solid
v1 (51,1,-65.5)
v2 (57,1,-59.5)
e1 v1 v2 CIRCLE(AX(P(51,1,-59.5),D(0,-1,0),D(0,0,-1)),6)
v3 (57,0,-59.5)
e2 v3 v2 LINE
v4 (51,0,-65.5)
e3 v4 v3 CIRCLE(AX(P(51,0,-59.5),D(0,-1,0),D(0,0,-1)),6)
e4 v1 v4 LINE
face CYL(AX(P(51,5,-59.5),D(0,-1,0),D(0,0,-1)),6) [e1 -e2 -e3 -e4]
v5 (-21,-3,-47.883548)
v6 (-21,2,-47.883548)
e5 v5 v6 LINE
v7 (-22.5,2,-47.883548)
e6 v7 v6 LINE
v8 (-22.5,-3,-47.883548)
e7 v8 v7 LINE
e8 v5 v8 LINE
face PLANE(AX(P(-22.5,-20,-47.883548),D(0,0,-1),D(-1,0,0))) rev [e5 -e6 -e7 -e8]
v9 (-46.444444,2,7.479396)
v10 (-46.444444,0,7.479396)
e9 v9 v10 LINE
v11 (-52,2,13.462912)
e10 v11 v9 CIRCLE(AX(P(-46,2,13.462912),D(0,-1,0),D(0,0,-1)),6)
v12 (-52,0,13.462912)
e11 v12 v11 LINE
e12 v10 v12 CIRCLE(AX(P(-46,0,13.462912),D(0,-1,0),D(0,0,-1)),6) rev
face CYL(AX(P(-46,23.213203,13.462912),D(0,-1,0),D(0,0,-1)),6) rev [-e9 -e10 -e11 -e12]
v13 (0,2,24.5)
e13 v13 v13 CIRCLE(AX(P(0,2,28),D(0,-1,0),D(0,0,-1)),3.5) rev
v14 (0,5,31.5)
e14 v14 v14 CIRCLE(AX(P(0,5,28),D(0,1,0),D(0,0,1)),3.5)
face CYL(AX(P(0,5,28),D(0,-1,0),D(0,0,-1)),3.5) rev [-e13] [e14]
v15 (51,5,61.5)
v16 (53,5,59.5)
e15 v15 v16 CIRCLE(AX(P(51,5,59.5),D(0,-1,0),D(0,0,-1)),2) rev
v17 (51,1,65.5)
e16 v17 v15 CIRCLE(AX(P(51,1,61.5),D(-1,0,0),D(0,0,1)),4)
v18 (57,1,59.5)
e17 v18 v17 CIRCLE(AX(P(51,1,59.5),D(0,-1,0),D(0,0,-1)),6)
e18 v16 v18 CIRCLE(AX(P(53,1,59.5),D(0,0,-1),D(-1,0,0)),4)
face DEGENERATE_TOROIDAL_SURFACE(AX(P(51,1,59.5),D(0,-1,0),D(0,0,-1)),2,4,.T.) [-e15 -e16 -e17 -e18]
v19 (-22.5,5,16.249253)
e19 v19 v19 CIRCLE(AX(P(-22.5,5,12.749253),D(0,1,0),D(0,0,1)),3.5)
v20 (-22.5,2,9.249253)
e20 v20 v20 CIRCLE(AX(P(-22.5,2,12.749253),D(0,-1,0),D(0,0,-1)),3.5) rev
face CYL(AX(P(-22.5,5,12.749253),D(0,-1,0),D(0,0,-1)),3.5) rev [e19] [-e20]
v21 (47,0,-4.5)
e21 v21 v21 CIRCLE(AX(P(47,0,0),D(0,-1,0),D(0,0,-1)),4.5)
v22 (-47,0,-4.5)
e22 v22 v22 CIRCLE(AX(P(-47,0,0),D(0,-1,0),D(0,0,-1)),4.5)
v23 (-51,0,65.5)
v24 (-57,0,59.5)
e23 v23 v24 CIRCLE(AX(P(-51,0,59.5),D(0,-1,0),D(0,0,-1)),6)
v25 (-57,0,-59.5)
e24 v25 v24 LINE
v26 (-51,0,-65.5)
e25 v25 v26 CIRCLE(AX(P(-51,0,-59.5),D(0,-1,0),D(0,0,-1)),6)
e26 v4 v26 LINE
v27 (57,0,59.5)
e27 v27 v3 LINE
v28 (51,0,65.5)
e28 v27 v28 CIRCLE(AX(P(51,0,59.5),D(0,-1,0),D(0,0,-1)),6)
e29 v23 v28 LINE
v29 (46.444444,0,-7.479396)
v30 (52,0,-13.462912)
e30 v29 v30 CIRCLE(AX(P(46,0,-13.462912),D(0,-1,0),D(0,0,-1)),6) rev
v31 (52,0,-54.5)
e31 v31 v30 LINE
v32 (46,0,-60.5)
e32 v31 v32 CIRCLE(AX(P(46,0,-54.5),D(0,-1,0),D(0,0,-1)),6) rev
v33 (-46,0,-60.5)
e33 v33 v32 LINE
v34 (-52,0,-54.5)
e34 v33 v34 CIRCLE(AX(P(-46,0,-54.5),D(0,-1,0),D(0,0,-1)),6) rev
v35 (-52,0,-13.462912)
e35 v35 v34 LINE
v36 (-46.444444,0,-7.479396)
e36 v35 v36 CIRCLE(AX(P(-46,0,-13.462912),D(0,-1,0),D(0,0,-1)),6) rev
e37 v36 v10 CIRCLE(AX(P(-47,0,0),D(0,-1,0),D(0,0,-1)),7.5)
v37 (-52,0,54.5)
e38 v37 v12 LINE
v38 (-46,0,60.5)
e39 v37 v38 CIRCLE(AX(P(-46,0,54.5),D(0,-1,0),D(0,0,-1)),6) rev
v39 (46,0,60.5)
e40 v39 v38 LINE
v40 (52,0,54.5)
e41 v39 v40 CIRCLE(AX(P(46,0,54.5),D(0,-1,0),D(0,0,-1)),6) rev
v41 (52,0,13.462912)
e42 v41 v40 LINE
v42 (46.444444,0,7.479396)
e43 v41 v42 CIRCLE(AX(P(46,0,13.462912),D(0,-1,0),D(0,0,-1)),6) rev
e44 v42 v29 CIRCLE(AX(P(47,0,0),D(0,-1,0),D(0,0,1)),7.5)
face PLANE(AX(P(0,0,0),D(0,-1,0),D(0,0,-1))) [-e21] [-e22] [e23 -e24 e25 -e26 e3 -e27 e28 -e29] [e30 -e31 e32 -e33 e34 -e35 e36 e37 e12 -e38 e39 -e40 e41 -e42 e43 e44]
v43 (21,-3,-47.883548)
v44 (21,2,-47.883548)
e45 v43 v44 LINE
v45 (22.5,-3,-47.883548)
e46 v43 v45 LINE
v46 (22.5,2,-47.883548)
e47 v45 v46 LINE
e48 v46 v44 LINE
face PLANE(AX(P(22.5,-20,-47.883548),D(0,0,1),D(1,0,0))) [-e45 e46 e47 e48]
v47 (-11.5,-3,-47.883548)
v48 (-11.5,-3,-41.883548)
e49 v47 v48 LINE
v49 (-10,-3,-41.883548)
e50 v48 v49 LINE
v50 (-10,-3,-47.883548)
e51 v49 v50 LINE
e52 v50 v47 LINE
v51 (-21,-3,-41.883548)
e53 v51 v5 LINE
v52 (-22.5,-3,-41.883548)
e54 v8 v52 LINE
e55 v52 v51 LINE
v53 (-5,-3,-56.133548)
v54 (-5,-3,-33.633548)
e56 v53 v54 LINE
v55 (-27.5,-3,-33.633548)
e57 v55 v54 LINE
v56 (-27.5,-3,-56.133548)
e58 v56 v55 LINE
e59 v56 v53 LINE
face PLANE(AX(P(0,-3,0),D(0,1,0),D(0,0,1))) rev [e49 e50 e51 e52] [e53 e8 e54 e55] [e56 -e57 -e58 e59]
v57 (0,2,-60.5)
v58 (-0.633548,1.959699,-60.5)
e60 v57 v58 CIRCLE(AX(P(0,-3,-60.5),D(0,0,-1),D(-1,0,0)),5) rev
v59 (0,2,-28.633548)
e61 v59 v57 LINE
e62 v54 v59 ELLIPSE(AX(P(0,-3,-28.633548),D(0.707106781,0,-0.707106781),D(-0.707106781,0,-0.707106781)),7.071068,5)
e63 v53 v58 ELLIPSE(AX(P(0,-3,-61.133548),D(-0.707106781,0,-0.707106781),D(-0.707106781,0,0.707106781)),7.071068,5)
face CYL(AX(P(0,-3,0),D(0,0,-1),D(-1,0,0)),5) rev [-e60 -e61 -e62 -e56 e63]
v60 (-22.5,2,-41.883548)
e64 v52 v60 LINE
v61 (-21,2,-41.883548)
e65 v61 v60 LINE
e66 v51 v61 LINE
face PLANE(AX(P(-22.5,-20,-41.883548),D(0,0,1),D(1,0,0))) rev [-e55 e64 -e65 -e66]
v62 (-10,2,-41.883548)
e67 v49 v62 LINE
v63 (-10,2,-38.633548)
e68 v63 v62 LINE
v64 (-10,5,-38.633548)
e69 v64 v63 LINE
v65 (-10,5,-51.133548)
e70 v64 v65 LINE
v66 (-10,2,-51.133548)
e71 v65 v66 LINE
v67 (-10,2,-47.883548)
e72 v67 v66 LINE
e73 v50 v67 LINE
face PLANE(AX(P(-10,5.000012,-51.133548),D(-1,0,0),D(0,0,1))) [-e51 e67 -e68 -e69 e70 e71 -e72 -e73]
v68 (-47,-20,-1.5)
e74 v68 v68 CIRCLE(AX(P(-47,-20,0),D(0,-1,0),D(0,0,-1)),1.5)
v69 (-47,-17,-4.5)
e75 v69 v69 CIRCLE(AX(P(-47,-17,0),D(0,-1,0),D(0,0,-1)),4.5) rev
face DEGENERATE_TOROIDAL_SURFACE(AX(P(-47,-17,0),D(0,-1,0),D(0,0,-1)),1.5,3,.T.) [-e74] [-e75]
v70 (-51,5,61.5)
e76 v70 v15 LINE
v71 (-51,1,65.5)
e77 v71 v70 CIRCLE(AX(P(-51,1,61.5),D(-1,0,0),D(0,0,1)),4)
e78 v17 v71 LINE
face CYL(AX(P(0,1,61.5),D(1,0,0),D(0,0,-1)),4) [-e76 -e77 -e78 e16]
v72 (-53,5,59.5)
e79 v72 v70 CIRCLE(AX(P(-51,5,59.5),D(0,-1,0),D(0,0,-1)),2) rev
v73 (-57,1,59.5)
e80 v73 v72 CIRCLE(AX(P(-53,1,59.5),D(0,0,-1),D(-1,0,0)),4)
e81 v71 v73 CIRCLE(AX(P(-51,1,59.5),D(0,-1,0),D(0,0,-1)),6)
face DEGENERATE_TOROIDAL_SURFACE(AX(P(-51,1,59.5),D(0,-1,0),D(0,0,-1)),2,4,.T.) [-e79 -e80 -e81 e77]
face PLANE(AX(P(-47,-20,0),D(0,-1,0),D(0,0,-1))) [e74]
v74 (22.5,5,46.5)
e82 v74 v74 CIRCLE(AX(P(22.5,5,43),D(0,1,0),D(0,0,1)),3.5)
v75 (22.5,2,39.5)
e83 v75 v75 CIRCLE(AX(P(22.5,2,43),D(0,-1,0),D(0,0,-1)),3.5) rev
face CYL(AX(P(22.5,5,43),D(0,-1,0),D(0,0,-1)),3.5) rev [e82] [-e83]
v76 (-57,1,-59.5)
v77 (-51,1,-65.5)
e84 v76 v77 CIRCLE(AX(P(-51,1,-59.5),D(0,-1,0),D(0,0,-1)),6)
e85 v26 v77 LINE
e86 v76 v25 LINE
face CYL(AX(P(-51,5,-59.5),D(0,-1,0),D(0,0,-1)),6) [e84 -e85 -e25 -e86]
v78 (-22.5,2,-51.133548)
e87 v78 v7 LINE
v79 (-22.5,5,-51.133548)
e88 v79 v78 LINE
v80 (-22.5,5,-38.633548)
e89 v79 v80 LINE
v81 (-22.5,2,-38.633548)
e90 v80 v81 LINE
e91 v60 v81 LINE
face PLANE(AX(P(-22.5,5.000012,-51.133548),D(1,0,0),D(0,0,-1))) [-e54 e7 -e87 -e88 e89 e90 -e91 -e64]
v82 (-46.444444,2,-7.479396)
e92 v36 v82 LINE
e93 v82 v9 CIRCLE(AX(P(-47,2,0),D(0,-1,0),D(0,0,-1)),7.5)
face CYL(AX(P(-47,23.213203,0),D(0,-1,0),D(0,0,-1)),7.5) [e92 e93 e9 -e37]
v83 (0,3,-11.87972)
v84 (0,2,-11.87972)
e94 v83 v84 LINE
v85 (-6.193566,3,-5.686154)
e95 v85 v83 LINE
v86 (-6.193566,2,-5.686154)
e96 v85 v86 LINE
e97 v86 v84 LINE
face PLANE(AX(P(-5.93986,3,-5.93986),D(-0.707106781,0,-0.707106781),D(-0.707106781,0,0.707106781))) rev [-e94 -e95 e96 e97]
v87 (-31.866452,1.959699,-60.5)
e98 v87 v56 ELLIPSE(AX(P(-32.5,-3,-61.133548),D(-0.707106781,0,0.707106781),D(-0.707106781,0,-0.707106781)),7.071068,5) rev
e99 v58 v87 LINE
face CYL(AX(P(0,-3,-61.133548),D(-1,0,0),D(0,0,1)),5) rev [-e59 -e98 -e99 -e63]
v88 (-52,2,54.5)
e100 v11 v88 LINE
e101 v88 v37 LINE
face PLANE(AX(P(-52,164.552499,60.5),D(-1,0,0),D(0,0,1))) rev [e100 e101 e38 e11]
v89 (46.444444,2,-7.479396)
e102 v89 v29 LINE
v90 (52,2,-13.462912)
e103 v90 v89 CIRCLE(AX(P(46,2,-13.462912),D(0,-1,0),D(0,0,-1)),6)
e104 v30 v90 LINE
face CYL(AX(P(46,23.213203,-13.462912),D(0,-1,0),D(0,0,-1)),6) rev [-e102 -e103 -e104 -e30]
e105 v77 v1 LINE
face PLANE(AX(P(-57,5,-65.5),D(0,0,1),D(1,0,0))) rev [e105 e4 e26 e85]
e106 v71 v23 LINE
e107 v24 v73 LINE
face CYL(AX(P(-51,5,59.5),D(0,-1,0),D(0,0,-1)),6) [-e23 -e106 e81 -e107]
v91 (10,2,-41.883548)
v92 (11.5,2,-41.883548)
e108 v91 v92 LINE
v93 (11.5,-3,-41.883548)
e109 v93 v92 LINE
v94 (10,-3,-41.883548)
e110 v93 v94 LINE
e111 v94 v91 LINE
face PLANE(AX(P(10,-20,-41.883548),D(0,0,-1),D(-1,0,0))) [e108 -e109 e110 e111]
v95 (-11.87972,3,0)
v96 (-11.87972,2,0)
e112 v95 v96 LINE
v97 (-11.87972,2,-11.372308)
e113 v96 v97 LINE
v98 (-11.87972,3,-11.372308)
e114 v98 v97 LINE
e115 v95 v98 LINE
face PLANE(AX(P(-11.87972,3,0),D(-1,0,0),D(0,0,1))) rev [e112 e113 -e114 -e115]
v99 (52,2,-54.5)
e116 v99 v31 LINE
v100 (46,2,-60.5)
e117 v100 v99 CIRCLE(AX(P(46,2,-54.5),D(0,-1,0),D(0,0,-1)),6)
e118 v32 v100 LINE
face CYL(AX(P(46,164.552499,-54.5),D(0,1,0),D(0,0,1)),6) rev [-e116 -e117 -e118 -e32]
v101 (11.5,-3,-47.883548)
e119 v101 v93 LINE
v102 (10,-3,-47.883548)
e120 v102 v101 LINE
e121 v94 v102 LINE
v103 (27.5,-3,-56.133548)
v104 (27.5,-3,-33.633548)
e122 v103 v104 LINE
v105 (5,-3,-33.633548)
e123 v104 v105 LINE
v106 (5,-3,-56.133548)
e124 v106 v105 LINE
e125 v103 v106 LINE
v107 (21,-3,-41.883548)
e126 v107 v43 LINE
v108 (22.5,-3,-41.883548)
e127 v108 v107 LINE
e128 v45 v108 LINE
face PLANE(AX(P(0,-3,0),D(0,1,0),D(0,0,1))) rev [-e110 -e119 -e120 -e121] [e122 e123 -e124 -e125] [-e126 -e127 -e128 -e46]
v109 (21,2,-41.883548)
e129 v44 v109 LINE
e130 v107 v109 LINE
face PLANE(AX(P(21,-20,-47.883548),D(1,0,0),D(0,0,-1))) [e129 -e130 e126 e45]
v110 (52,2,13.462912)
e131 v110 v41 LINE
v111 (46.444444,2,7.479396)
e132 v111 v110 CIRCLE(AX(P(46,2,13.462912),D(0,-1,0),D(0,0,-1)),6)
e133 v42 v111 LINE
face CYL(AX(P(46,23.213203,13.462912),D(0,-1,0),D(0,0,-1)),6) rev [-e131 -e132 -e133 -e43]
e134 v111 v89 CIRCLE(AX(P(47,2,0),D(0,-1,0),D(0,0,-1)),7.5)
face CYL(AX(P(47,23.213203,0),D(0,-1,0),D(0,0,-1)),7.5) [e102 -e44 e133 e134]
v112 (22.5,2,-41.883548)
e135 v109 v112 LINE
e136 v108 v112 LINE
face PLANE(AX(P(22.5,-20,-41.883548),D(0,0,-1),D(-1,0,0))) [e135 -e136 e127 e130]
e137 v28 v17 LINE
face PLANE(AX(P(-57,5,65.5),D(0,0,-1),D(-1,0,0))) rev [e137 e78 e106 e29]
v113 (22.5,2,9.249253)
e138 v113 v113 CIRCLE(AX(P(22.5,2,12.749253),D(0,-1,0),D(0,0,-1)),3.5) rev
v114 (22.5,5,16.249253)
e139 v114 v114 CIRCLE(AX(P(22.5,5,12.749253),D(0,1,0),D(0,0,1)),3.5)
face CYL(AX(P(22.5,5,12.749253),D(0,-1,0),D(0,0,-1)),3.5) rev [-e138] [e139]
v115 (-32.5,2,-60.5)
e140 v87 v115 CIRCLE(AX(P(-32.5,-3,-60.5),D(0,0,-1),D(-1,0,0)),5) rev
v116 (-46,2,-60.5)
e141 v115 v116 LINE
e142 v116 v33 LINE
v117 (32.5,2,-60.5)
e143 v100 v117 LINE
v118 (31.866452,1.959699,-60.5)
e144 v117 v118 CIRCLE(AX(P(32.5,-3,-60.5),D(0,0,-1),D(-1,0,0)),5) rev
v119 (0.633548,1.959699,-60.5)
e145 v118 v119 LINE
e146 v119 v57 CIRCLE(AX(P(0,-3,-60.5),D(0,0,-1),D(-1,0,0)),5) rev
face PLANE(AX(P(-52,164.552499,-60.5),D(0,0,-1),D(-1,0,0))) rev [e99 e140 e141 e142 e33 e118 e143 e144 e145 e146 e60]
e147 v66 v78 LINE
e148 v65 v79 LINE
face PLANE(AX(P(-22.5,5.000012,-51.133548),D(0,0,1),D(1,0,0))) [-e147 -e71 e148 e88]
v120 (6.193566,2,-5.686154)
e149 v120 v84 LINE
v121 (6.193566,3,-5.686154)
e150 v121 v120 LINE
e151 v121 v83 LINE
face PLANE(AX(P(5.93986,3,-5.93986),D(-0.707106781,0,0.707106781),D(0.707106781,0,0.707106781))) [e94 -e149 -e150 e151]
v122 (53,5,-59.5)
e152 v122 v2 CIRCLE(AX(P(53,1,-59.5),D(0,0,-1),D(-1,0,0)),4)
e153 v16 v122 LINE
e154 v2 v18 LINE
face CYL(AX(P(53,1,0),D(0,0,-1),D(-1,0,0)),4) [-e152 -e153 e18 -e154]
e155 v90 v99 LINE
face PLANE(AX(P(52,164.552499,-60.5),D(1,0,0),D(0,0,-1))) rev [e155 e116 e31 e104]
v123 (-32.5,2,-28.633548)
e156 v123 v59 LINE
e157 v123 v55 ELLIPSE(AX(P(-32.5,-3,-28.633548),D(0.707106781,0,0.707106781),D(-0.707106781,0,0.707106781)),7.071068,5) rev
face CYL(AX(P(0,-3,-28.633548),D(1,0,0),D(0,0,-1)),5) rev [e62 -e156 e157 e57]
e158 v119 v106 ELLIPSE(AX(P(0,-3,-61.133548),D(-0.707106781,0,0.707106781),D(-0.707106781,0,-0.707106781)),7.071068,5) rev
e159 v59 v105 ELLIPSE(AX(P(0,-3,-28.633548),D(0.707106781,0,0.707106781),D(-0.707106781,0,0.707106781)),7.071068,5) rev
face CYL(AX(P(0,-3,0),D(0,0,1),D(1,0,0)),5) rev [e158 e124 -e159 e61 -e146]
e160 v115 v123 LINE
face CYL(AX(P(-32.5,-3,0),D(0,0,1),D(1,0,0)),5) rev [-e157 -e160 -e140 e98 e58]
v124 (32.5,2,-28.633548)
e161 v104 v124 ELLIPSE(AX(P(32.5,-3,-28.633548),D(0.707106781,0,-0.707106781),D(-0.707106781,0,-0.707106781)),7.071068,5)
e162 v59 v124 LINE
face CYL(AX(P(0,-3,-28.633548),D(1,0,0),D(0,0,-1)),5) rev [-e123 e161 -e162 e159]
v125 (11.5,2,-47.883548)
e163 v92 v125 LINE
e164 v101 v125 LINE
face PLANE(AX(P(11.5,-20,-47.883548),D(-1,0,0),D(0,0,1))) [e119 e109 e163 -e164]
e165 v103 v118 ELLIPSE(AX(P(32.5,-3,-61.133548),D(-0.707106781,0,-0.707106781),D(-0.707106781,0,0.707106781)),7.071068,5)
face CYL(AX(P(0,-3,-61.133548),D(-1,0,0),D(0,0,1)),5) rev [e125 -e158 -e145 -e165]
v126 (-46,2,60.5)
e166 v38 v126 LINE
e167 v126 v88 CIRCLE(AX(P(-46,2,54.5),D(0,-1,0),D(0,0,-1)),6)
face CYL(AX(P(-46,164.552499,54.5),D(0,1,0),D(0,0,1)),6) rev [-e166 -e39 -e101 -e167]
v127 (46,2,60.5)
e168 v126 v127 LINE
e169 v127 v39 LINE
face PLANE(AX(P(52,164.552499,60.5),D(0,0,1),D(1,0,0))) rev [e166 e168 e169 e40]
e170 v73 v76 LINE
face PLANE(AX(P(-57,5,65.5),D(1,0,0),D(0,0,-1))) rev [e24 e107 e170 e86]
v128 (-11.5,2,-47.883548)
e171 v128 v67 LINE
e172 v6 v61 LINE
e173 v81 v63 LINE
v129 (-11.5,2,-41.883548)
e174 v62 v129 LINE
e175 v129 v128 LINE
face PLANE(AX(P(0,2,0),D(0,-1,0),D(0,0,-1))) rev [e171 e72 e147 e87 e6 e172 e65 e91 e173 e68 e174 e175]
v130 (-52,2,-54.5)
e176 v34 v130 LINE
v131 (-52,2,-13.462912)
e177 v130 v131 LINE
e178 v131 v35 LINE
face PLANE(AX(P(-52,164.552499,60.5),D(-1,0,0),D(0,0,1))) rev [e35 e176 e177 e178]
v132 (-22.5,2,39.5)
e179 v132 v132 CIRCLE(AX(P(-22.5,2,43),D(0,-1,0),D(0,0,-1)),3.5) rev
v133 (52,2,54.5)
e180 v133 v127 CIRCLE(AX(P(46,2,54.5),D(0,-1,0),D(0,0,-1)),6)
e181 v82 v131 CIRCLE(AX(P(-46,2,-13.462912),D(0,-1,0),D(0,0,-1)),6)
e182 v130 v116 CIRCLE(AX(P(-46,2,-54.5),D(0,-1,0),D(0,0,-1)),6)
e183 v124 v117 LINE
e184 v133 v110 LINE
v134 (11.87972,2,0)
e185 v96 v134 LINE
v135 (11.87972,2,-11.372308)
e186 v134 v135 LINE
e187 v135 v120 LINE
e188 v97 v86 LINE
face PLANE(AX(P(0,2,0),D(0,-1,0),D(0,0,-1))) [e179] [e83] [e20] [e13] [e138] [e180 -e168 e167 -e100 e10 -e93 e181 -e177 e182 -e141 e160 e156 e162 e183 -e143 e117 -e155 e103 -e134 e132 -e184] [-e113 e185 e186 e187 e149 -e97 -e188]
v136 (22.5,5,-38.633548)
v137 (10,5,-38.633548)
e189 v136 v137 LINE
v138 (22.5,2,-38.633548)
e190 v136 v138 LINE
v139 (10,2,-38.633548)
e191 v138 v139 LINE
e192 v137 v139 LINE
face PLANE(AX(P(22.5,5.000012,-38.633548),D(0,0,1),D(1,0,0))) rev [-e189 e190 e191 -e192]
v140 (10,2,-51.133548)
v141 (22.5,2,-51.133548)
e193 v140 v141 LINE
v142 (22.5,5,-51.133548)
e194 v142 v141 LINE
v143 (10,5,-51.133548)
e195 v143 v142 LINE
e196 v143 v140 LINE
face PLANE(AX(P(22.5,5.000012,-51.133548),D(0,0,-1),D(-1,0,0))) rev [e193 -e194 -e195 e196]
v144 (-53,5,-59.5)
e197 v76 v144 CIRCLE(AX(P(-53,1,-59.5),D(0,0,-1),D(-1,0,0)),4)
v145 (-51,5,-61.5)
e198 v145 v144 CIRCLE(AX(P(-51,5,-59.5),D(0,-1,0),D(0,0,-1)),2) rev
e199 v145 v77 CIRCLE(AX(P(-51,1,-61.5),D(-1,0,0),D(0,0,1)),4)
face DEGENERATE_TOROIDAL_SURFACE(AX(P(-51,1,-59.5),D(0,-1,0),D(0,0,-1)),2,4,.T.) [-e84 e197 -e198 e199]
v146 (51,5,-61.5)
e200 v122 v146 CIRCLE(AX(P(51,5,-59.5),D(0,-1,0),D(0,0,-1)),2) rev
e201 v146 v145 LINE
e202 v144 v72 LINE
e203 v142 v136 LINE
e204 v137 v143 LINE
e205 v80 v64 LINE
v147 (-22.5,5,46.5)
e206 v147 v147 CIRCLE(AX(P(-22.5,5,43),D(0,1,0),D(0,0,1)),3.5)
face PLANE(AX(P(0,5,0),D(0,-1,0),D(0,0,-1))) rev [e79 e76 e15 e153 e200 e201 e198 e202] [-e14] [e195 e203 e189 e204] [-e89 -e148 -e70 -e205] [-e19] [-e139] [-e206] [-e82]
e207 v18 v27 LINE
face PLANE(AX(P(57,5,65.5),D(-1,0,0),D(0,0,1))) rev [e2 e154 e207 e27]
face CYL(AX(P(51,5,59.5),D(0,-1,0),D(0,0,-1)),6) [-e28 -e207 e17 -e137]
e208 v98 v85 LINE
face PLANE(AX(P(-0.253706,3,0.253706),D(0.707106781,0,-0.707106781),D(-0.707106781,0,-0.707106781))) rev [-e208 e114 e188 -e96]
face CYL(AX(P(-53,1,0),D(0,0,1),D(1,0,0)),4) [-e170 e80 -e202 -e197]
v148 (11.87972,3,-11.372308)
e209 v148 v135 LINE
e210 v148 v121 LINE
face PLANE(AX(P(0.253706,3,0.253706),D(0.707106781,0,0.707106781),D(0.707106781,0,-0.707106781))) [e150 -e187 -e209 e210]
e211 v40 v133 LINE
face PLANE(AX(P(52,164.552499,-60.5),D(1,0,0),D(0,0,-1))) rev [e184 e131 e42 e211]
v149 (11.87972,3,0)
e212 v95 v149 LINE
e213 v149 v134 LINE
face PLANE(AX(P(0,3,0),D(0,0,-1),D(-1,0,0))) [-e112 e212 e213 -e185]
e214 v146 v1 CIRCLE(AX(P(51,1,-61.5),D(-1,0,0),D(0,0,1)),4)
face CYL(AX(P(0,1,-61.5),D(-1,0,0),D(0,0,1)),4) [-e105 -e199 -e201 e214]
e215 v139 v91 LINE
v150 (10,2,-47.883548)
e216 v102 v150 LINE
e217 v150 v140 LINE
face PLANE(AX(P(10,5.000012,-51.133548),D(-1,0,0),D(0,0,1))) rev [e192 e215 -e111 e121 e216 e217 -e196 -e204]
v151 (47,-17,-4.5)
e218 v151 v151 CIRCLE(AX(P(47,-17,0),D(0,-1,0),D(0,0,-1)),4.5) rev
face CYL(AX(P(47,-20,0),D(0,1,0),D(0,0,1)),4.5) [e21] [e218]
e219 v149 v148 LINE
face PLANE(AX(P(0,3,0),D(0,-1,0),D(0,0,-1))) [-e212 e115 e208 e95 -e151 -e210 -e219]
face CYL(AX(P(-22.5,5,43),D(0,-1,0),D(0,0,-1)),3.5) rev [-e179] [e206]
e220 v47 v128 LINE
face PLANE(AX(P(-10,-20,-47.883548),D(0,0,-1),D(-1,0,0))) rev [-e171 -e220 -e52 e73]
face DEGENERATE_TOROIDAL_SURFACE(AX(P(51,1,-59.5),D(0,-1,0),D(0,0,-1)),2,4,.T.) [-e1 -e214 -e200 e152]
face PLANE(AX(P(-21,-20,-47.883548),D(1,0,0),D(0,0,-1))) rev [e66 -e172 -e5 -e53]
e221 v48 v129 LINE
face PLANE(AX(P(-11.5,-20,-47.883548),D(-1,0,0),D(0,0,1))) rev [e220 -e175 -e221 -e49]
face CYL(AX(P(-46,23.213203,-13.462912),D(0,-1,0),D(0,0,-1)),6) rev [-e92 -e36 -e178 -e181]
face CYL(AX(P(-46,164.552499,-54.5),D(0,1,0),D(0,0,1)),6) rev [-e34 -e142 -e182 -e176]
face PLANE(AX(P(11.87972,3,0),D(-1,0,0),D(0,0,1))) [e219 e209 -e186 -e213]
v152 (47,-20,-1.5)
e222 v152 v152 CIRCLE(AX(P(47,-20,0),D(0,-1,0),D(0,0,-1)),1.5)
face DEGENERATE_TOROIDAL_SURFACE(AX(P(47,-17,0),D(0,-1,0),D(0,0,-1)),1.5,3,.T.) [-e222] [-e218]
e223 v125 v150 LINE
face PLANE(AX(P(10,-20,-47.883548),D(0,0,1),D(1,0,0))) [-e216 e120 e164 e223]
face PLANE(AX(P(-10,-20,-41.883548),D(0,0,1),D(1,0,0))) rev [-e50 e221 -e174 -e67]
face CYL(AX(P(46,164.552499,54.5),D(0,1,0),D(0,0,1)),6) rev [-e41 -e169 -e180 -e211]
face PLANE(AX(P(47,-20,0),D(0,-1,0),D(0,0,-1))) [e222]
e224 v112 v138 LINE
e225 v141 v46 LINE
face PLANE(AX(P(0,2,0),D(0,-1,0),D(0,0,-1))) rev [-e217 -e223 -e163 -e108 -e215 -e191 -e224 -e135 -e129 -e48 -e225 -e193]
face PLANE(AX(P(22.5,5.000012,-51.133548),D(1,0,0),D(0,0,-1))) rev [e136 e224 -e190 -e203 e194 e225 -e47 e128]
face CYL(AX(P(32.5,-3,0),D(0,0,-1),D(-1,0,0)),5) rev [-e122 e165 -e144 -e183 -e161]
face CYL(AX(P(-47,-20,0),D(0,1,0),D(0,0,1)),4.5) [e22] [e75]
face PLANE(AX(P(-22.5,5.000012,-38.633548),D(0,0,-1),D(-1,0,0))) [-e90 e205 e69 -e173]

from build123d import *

# Parameters (mm, degrees)
SKETCH1_W             = 114
SKETCH1_H             = 131
BOSS_EXTRUDE1_DEPTH   = 5
SKETCH3_W             = 104
SKETCH3_H             = 121
CUT_EXTRUDE2_DEPTH    = 2
FILLET1_R             = 6
FILLET2_R             = 4
FILLET3_R             = 6
SKETCH5_R             = 7.5
BOSS_EXTRUDE2_DEPTH   = 2
FILLET4_R             = 6
FILLET7_R             = 6
SKETCH15_R            = 4.5
BOSS_EXTRUDE4_DEPTH   = 20
FILLET8_R             = 3
SKETCH10_R            = 3.5
CUT_EXTRUDE3_DEPTH    = 90.102469102
SKETCH11_W            = 22.5
SKETCH11_H            = 22.5
SKETCH11_W_2          = 12.5
SKETCH11_H_2          = 12.5
BOSS_EXTRUDE3_DEPTH   = 8
CUT_EXTRUDE5_START    = -3
SKETCH13_W            = 12.5
SKETCH13_H            = 12.5
CUT_EXTRUDE5_DEPTH    = 94.356239408
SKETCH14_W            = 1.5
SKETCH14_H            = 6
CUT_EXTRUDE6_DEPTH    = 90.572596256
FILLET10_R            = 5
FILLET10_OF_MIRROR1_R = 5
CUT_EXTRUDE7_DEPTH    = 1


with BuildPart() as part:
    # Sketch1 → Boss-Extrude1 (new body)
    with BuildSketch(Plane(origin=(0, 0, 0), x_dir=(1, 0, 0), z_dir=(0, 1, 0))):
        Rectangle(SKETCH1_W, SKETCH1_H)
    extrude(amount=BOSS_EXTRUDE1_DEPTH)

    # Sketch3 → Cut-Extrude2 (cut)
    with BuildSketch(Plane.XZ):
        Rectangle(SKETCH3_W, SKETCH3_H)
    extrude(amount=-CUT_EXTRUDE2_DEPTH, mode=Mode.SUBTRACT)

    # Fillet1
    fillet1_edges = [part.edges().sort_by_distance(p)[0] for p in [
        (57, 2.5, 65.5),
        (-57, 2.5, 65.5),
        (-57, 2.5, -65.5),
        (57, 2.5, -65.5),
    ]]
    fillet(fillet1_edges, radius=FILLET1_R)

    # Fillet2
    fillet2_edges = [part.edges().sort_by_distance(p)[0] for p in [
        (0, 5, 65.5),
        (-57, 5, 0),
        (57, 5, 0),
        (0, 5, -65.5),
        (55.242640687, 5, 63.742640687),
        (55.242640687, 5, -63.742640687),
        (-55.242640687, 5, -63.742640687),
        (-55.242640687, 5, 63.742640687),
    ]]
    fillet(fillet2_edges, radius=FILLET2_R)

    # Fillet3
    fillet3_edges = [part.edges().sort_by_distance(p)[0] for p in [
        (52, 1, -60.5),
        (-52, 1, -60.5),
        (-52, 1, 60.5),
        (52, 1, 60.5),
    ]]
    fillet(fillet3_edges, radius=FILLET3_R)

    # Sketch5 → Boss-Extrude2 (add)
    with BuildSketch(Plane.XZ):
        with Locations((-47, 0)):
            Circle(SKETCH5_R)
        with Locations((47, 0)):
            Circle(SKETCH5_R)
    extrude(amount=-BOSS_EXTRUDE2_DEPTH)

    # Fillet4
    fillet4_edges = [part.edges().sort_by_distance(p)[0] for p in [
        (-52, 1, -5.590169944),
        (-52, 1, 5.590169944),
    ]]
    fillet(fillet4_edges, radius=FILLET4_R)

    # Fillet7
    fillet7_edges = [part.edges().sort_by_distance(p)[0] for p in [
        (52, 1, 5.590169944),
        (52, 1, -5.590169944),
    ]]
    fillet(fillet7_edges, radius=FILLET7_R)

    # Sketch15 → Boss-Extrude4 (add)
    with BuildSketch(Plane.XZ):
        with Locations(Location((-47, 0, 0), (0, 0, 270))):
            Circle(SKETCH15_R)
        with Locations(Location((47, 0, 0), (0, 0, 270))):
            Circle(SKETCH15_R)
    extrude(amount=BOSS_EXTRUDE4_DEPTH)

    # Fillet8
    fillet8_edges = [part.edges().sort_by_distance(p)[0] for p in [
        (-47, -20, 4.5),
        (47, -20, 4.5),
    ]]
    fillet(fillet8_edges, radius=FILLET8_R)

    # Sketch10 → Cut-Extrude3 (cut, through all)
    with BuildSketch(Plane(origin=(0, 0, 0), x_dir=(1, 0, 0), z_dir=(0, 1, 0))):
        with Locations(Location((-22.5, -43, 0), (0, 0, 90))):
            Circle(SKETCH10_R)
        with Locations(Location((22.5, -43, 0), (0, 0, 90))):
            Circle(SKETCH10_R)
        with Locations(Location((22.5, -12.749252692, 0), (0, 0, 90))):
            Circle(SKETCH10_R)
        with Locations(Location((-22.5, -12.749252692, 0), (0, 0, 90))):
            Circle(SKETCH10_R)
        with Locations(Location((0, -28, 0), (0, 0, 90))):
            Circle(SKETCH10_R)
    extrude(amount=CUT_EXTRUDE3_DEPTH, mode=Mode.SUBTRACT)

    # Sketch11 → Boss-Extrude3 (add)
    # profile 1 of 2: a face of its own
    with BuildSketch(Plane(origin=(0, 5, 0), x_dir=(1, 0, 0), z_dir=(0, 1, 0))):
        with Locations((-16.25, 44.883548137)):
            Rectangle(SKETCH11_W, SKETCH11_H)
        with Locations((-16.25, 44.883548137)):
            Rectangle(SKETCH11_W_2, SKETCH11_H_2, mode=Mode.SUBTRACT)
    # profile 2 of 2: a face of its own
    with BuildSketch(Plane(origin=(0, 5, 0), x_dir=(1, 0, 0), z_dir=(0, 1, 0))):
        with Locations((-16.25, 44.883548137)):
            Rectangle(SKETCH11_W_2, SKETCH11_H_2)
    boss_extrude3 = extrude(amount=-BOSS_EXTRUDE3_DEPTH)

    # Sketch13 → Cut-Extrude5 (cut)
    with BuildSketch(Plane(origin=(0, 5, 0), x_dir=(1, 0, 0), z_dir=(0, 1, 0)).offset(CUT_EXTRUDE5_START)):
        with Locations((-16.25, 44.883548137)):
            Rectangle(SKETCH13_W, SKETCH13_H)
    cut_extrude5 = extrude(amount=CUT_EXTRUDE5_DEPTH, mode=Mode.SUBTRACT)

    # Sketch14 → Cut-Extrude6 (cut, symmetric)
    with BuildSketch(Plane(origin=(0, 2, 0), x_dir=(1, 0, 0), z_dir=(0, 1, 0))):
        with Locations((-21.75, 44.883548137)):
            Rectangle(SKETCH14_W, SKETCH14_H)
        with Locations((-10.75, 44.883548137)):
            Rectangle(SKETCH14_W, SKETCH14_H)
    cut_extrude6 = extrude(amount=CUT_EXTRUDE6_DEPTH, both=True, mode=Mode.SUBTRACT)

    # Fillet10
    # the kernel refuses this fillet: 5 mm, written as the material it adds along each edge
    with BuildSketch(Plane(origin=(-27.5, 2, -33.633548137), x_dir=(0, 0, 1), z_dir=(1, 0, 0)), Plane(origin=(-5, 2, -56.133548137), x_dir=(0, 0, -1), z_dir=(-1, 0, 0)), Plane(origin=(-5, 2, -33.633548137), x_dir=(1, 0, 0), z_dir=(0, 0, -1)), Plane(origin=(-27.5, 2, -56.133548137), x_dir=(-1, 0, 0), z_dir=(0, 0, 1))) as fillet10_piece_1:
        with BuildLine():
            CenterArc((FILLET10_R, FILLET10_R), FILLET10_R, 180, 90)
            Line((0, FILLET10_R), (0, 0))
            Line((0, 0), (FILLET10_R, 0))
        make_face()
    extrude(amount=22.5)
    with BuildSketch(Plane(origin=(-40, 2, -33.633548137), x_dir=(0, 0, 1), z_dir=(1, 0, 0))) as fillet10_piece_2a_section:
        with BuildLine():
            CenterArc((FILLET10_R, FILLET10_R), FILLET10_R, 180, 90)
            Line((0, FILLET10_R), (0, 0))
            Line((0, 0), (FILLET10_R, 0))
        make_face()
    fillet10_piece_2a = extrude(amount=35, mode=Mode.PRIVATE)
    fillet10_piece_2a = split(fillet10_piece_2a, bisect_by=Plane(origin=(-27.5, 2, -33.633548137), z_dir=(-1, 0, 0)), keep=Keep.TOP, mode=Mode.PRIVATE)
    with BuildSketch(Plane(origin=(-27.5, 2, -56.133548137), x_dir=(-1, 0, 0), z_dir=(0, 0, 1))) as fillet10_piece_2b_section:
        with BuildLine():
            CenterArc((FILLET10_R, FILLET10_R), FILLET10_R, 180, 90)
            Line((0, FILLET10_R), (0, 0))
            Line((0, 0), (FILLET10_R, 0))
        make_face()
    fillet10_piece_2b = extrude(amount=35, mode=Mode.PRIVATE)
    fillet10_piece_2b = split(fillet10_piece_2b, bisect_by=Plane(origin=(-27.5, 2, -33.633548137), z_dir=(0, 0, 1)), keep=Keep.TOP, mode=Mode.PRIVATE)
    fillet10_piece_2 = fillet10_piece_2a & fillet10_piece_2b
    add(fillet10_piece_2)
    with BuildSketch(Plane(origin=(-5, 2, -21.133548137), x_dir=(1, 0, 0), z_dir=(0, 0, -1))) as fillet10_piece_3a_section:
        with BuildLine():
            CenterArc((FILLET10_R, FILLET10_R), FILLET10_R, 180, 90)
            Line((0, FILLET10_R), (0, 0))
            Line((0, 0), (FILLET10_R, 0))
        make_face()
    fillet10_piece_3a = extrude(amount=35, mode=Mode.PRIVATE)
    fillet10_piece_3a = split(fillet10_piece_3a, bisect_by=Plane(origin=(-5, 2, -33.633548137), z_dir=(0, 0, 1)), keep=Keep.TOP, mode=Mode.PRIVATE)
    with BuildSketch(Plane(origin=(-27.5, 2, -33.633548137), x_dir=(0, 0, 1), z_dir=(1, 0, 0))) as fillet10_piece_3b_section:
        with BuildLine():
            CenterArc((FILLET10_R, FILLET10_R), FILLET10_R, 180, 90)
            Line((0, FILLET10_R), (0, 0))
            Line((0, 0), (FILLET10_R, 0))
        make_face()
    fillet10_piece_3b = extrude(amount=35, mode=Mode.PRIVATE)
    fillet10_piece_3b = split(fillet10_piece_3b, bisect_by=Plane(origin=(-5, 2, -33.633548137), z_dir=(1, 0, 0)), keep=Keep.TOP, mode=Mode.PRIVATE)
    fillet10_piece_3 = fillet10_piece_3a & fillet10_piece_3b
    add(fillet10_piece_3)
    with BuildSketch(Plane(origin=(-5, 2, -33.633548137), x_dir=(1, 0, 0), z_dir=(0, 0, -1))) as fillet10_piece_4a_section:
        with BuildLine():
            CenterArc((FILLET10_R, FILLET10_R), FILLET10_R, 180, 90)
            Line((0, FILLET10_R), (0, 0))
            Line((0, 0), (FILLET10_R, 0))
        make_face()
    fillet10_piece_4a = extrude(amount=35, mode=Mode.PRIVATE)
    fillet10_piece_4a = split(fillet10_piece_4a, bisect_by=Plane(origin=(-5, 2, -56.133548137), z_dir=(0, 0, -1)), keep=Keep.TOP, mode=Mode.PRIVATE)
    with BuildSketch(Plane(origin=(7.5, 2, -56.133548137), x_dir=(0, 0, -1), z_dir=(-1, 0, 0))) as fillet10_piece_4b_section:
        with BuildLine():
            CenterArc((FILLET10_R, FILLET10_R), FILLET10_R, 180, 90)
            Line((0, FILLET10_R), (0, 0))
            Line((0, 0), (FILLET10_R, 0))
        make_face()
    fillet10_piece_4b = extrude(amount=35, mode=Mode.PRIVATE)
    fillet10_piece_4b = split(fillet10_piece_4b, bisect_by=Plane(origin=(-5, 2, -56.133548137), z_dir=(1, 0, 0)), keep=Keep.TOP, mode=Mode.PRIVATE)
    fillet10_piece_4 = fillet10_piece_4a & fillet10_piece_4b
    add(fillet10_piece_4)
    with BuildSketch(Plane(origin=(-27.5, 2, -68.633548137), x_dir=(-1, 0, 0), z_dir=(0, 0, 1))) as fillet10_piece_5a_section:
        with BuildLine():
            CenterArc((FILLET10_R, FILLET10_R), FILLET10_R, 180, 90)
            Line((0, FILLET10_R), (0, 0))
            Line((0, 0), (FILLET10_R, 0))
        make_face()
    fillet10_piece_5a = extrude(amount=35, mode=Mode.PRIVATE)
    fillet10_piece_5a = split(fillet10_piece_5a, bisect_by=Plane(origin=(-27.5, 2, -56.133548137), z_dir=(0, 0, -1)), keep=Keep.TOP, mode=Mode.PRIVATE)
    with BuildSketch(Plane(origin=(-5, 2, -56.133548137), x_dir=(0, 0, -1), z_dir=(-1, 0, 0))) as fillet10_piece_5b_section:
        with BuildLine():
            CenterArc((FILLET10_R, FILLET10_R), FILLET10_R, 180, 90)
            Line((0, FILLET10_R), (0, 0))
            Line((0, 0), (FILLET10_R, 0))
        make_face()
    fillet10_piece_5b = extrude(amount=35, mode=Mode.PRIVATE)
    fillet10_piece_5b = split(fillet10_piece_5b, bisect_by=Plane(origin=(-27.5, 2, -56.133548137), z_dir=(-1, 0, 0)), keep=Keep.TOP, mode=Mode.PRIVATE)
    fillet10_piece_5 = fillet10_piece_5a & fillet10_piece_5b
    add(fillet10_piece_5)

    # Mirror1: Boss-Extrude3, Cut-Extrude5, Cut-Extrude6 across plane
    add(boss_extrude3.mirror(Plane(origin=(0, 0, 0), x_dir=(0, 0, 1), z_dir=(1, 0, 0))))
    add(cut_extrude5.mirror(Plane(origin=(0, 0, 0), x_dir=(0, 0, 1), z_dir=(1, 0, 0))), mode=Mode.SUBTRACT)
    add(cut_extrude6.mirror(Plane(origin=(0, 0, 0), x_dir=(0, 0, 1), z_dir=(1, 0, 0))), mode=Mode.SUBTRACT)

    # Fillet10 of Mirror1
    # the kernel refuses this fillet: 5 mm, written as the material it adds along each edge
    with BuildSketch(Plane(origin=(27.5, 2, -33.633548137), x_dir=(0, 0, 1), z_dir=(-1, 0, 0)), Plane(origin=(5, 2, -56.133548137), x_dir=(0, 0, -1), z_dir=(1, 0, 0)), Plane(origin=(5, 2, -33.633548137), x_dir=(-1, 0, 0), z_dir=(0, 0, -1)), Plane(origin=(27.5, 2, -56.133548137), x_dir=(1, 0, 0), z_dir=(0, 0, 1))) as fillet10_of_mirror1_piece_1:
        with BuildLine():
            CenterArc((FILLET10_OF_MIRROR1_R, -FILLET10_OF_MIRROR1_R), FILLET10_OF_MIRROR1_R, 90, 90)
            Line((0, -FILLET10_OF_MIRROR1_R), (0, 0))
            Line((0, 0), (FILLET10_OF_MIRROR1_R, 0))
        make_face()
    extrude(amount=22.5)
    with BuildSketch(Plane(origin=(27.5, 2, -56.133548137), x_dir=(1, 0, 0), z_dir=(0, 0, 1))) as fillet10_of_mirror1_piece_2a_section:
        with BuildLine():
            CenterArc((FILLET10_OF_MIRROR1_R, -FILLET10_OF_MIRROR1_R), FILLET10_OF_MIRROR1_R, 90, 90)
            Line((0, -FILLET10_OF_MIRROR1_R), (0, 0))
            Line((0, 0), (FILLET10_OF_MIRROR1_R, 0))
        make_face()
    fillet10_of_mirror1_piece_2a = extrude(amount=35, mode=Mode.PRIVATE)
    fillet10_of_mirror1_piece_2a = split(fillet10_of_mirror1_piece_2a, bisect_by=Plane(origin=(27.5, 2, -33.633548137), z_dir=(0, 0, 1)), keep=Keep.TOP, mode=Mode.PRIVATE)
    with BuildSketch(Plane(origin=(40, 2, -33.633548137), x_dir=(0, 0, 1), z_dir=(-1, 0, 0))) as fillet10_of_mirror1_piece_2b_section:
        with BuildLine():
            CenterArc((FILLET10_OF_MIRROR1_R, -FILLET10_OF_MIRROR1_R), FILLET10_OF_MIRROR1_R, 90, 90)
            Line((0, -FILLET10_OF_MIRROR1_R), (0, 0))
            Line((0, 0), (FILLET10_OF_MIRROR1_R, 0))
        make_face()
    fillet10_of_mirror1_piece_2b = extrude(amount=35, mode=Mode.PRIVATE)
    fillet10_of_mirror1_piece_2b = split(fillet10_of_mirror1_piece_2b, bisect_by=Plane(origin=(27.5, 2, -33.633548137), z_dir=(1, 0, 0)), keep=Keep.TOP, mode=Mode.PRIVATE)
    fillet10_of_mirror1_piece_2 = fillet10_of_mirror1_piece_2a & fillet10_of_mirror1_piece_2b
    add(fillet10_of_mirror1_piece_2)
    with BuildSketch(Plane(origin=(27.5, 2, -33.633548137), x_dir=(0, 0, 1), z_dir=(-1, 0, 0))) as fillet10_of_mirror1_piece_3a_section:
        with BuildLine():
            CenterArc((FILLET10_OF_MIRROR1_R, -FILLET10_OF_MIRROR1_R), FILLET10_OF_MIRROR1_R, 90, 90)
            Line((0, -FILLET10_OF_MIRROR1_R), (0, 0))
            Line((0, 0), (FILLET10_OF_MIRROR1_R, 0))
        make_face()
    fillet10_of_mirror1_piece_3a = extrude(amount=35, mode=Mode.PRIVATE)
    fillet10_of_mirror1_piece_3a = split(fillet10_of_mirror1_piece_3a, bisect_by=Plane(origin=(5, 2, -33.633548137), z_dir=(-1, 0, 0)), keep=Keep.TOP, mode=Mode.PRIVATE)
    with BuildSketch(Plane(origin=(5, 2, -21.133548137), x_dir=(-1, 0, 0), z_dir=(0, 0, -1))) as fillet10_of_mirror1_piece_3b_section:
        with BuildLine():
            CenterArc((FILLET10_OF_MIRROR1_R, -FILLET10_OF_MIRROR1_R), FILLET10_OF_MIRROR1_R, 90, 90)
            Line((0, -FILLET10_OF_MIRROR1_R), (0, 0))
            Line((0, 0), (FILLET10_OF_MIRROR1_R, 0))
        make_face()
    fillet10_of_mirror1_piece_3b = extrude(amount=35, mode=Mode.PRIVATE)
    fillet10_of_mirror1_piece_3b = split(fillet10_of_mirror1_piece_3b, bisect_by=Plane(origin=(5, 2, -33.633548137), z_dir=(0, 0, 1)), keep=Keep.TOP, mode=Mode.PRIVATE)
    fillet10_of_mirror1_piece_3 = fillet10_of_mirror1_piece_3a & fillet10_of_mirror1_piece_3b
    add(fillet10_of_mirror1_piece_3)
    with BuildSketch(Plane(origin=(-7.5, 2, -56.133548137), x_dir=(0, 0, -1), z_dir=(1, 0, 0))) as fillet10_of_mirror1_piece_4a_section:
        with BuildLine():
            CenterArc((FILLET10_OF_MIRROR1_R, -FILLET10_OF_MIRROR1_R), FILLET10_OF_MIRROR1_R, 90, 90)
            Line((0, -FILLET10_OF_MIRROR1_R), (0, 0))
            Line((0, 0), (FILLET10_OF_MIRROR1_R, 0))
        make_face()
    fillet10_of_mirror1_piece_4a = extrude(amount=35, mode=Mode.PRIVATE)
    fillet10_of_mirror1_piece_4a = split(fillet10_of_mirror1_piece_4a, bisect_by=Plane(origin=(5, 2, -56.133548137), z_dir=(-1, 0, 0)), keep=Keep.TOP, mode=Mode.PRIVATE)
    with BuildSketch(Plane(origin=(5, 2, -33.633548137), x_dir=(-1, 0, 0), z_dir=(0, 0, -1))) as fillet10_of_mirror1_piece_4b_section:
        with BuildLine():
            CenterArc((FILLET10_OF_MIRROR1_R, -FILLET10_OF_MIRROR1_R), FILLET10_OF_MIRROR1_R, 90, 90)
            Line((0, -FILLET10_OF_MIRROR1_R), (0, 0))
            Line((0, 0), (FILLET10_OF_MIRROR1_R, 0))
        make_face()
    fillet10_of_mirror1_piece_4b = extrude(amount=35, mode=Mode.PRIVATE)
    fillet10_of_mirror1_piece_4b = split(fillet10_of_mirror1_piece_4b, bisect_by=Plane(origin=(5, 2, -56.133548137), z_dir=(0, 0, -1)), keep=Keep.TOP, mode=Mode.PRIVATE)
    fillet10_of_mirror1_piece_4 = fillet10_of_mirror1_piece_4a & fillet10_of_mirror1_piece_4b
    add(fillet10_of_mirror1_piece_4)
    with BuildSketch(Plane(origin=(5, 2, -56.133548137), x_dir=(0, 0, -1), z_dir=(1, 0, 0))) as fillet10_of_mirror1_piece_5a_section:
        with BuildLine():
            CenterArc((FILLET10_OF_MIRROR1_R, -FILLET10_OF_MIRROR1_R), FILLET10_OF_MIRROR1_R, 90, 90)
            Line((0, -FILLET10_OF_MIRROR1_R), (0, 0))
            Line((0, 0), (FILLET10_OF_MIRROR1_R, 0))
        make_face()
    fillet10_of_mirror1_piece_5a = extrude(amount=35, mode=Mode.PRIVATE)
    fillet10_of_mirror1_piece_5a = split(fillet10_of_mirror1_piece_5a, bisect_by=Plane(origin=(27.5, 2, -56.133548137), z_dir=(1, 0, 0)), keep=Keep.TOP, mode=Mode.PRIVATE)
    with BuildSketch(Plane(origin=(27.5, 2, -68.633548137), x_dir=(1, 0, 0), z_dir=(0, 0, 1))) as fillet10_of_mirror1_piece_5b_section:
        with BuildLine():
            CenterArc((FILLET10_OF_MIRROR1_R, -FILLET10_OF_MIRROR1_R), FILLET10_OF_MIRROR1_R, 90, 90)
            Line((0, -FILLET10_OF_MIRROR1_R), (0, 0))
            Line((0, 0), (FILLET10_OF_MIRROR1_R, 0))
        make_face()
    fillet10_of_mirror1_piece_5b = extrude(amount=35, mode=Mode.PRIVATE)
    fillet10_of_mirror1_piece_5b = split(fillet10_of_mirror1_piece_5b, bisect_by=Plane(origin=(27.5, 2, -56.133548137), z_dir=(0, 0, -1)), keep=Keep.TOP, mode=Mode.PRIVATE)
    fillet10_of_mirror1_piece_5 = fillet10_of_mirror1_piece_5a & fillet10_of_mirror1_piece_5b
    add(fillet10_of_mirror1_piece_5)

    # Sketch16 → Cut-Extrude7 (cut)
    with BuildSketch(Plane.XZ.offset(-2)):
        Polygon((0, 0), (0, -11.879719733), (6.193565843, -5.68615389), (11.879719733, -11.372307779), (11.879719733, 0), align=None)
        Polygon((-6.193565843, -5.68615389), (0, -11.879719733), (0, 0), (-11.879719733, 0), (-11.879719733, -11.372307779), align=None)
    extrude(amount=-CUT_EXTRUDE7_DEPTH, mode=Mode.SUBTRACT)


solid = part.part
